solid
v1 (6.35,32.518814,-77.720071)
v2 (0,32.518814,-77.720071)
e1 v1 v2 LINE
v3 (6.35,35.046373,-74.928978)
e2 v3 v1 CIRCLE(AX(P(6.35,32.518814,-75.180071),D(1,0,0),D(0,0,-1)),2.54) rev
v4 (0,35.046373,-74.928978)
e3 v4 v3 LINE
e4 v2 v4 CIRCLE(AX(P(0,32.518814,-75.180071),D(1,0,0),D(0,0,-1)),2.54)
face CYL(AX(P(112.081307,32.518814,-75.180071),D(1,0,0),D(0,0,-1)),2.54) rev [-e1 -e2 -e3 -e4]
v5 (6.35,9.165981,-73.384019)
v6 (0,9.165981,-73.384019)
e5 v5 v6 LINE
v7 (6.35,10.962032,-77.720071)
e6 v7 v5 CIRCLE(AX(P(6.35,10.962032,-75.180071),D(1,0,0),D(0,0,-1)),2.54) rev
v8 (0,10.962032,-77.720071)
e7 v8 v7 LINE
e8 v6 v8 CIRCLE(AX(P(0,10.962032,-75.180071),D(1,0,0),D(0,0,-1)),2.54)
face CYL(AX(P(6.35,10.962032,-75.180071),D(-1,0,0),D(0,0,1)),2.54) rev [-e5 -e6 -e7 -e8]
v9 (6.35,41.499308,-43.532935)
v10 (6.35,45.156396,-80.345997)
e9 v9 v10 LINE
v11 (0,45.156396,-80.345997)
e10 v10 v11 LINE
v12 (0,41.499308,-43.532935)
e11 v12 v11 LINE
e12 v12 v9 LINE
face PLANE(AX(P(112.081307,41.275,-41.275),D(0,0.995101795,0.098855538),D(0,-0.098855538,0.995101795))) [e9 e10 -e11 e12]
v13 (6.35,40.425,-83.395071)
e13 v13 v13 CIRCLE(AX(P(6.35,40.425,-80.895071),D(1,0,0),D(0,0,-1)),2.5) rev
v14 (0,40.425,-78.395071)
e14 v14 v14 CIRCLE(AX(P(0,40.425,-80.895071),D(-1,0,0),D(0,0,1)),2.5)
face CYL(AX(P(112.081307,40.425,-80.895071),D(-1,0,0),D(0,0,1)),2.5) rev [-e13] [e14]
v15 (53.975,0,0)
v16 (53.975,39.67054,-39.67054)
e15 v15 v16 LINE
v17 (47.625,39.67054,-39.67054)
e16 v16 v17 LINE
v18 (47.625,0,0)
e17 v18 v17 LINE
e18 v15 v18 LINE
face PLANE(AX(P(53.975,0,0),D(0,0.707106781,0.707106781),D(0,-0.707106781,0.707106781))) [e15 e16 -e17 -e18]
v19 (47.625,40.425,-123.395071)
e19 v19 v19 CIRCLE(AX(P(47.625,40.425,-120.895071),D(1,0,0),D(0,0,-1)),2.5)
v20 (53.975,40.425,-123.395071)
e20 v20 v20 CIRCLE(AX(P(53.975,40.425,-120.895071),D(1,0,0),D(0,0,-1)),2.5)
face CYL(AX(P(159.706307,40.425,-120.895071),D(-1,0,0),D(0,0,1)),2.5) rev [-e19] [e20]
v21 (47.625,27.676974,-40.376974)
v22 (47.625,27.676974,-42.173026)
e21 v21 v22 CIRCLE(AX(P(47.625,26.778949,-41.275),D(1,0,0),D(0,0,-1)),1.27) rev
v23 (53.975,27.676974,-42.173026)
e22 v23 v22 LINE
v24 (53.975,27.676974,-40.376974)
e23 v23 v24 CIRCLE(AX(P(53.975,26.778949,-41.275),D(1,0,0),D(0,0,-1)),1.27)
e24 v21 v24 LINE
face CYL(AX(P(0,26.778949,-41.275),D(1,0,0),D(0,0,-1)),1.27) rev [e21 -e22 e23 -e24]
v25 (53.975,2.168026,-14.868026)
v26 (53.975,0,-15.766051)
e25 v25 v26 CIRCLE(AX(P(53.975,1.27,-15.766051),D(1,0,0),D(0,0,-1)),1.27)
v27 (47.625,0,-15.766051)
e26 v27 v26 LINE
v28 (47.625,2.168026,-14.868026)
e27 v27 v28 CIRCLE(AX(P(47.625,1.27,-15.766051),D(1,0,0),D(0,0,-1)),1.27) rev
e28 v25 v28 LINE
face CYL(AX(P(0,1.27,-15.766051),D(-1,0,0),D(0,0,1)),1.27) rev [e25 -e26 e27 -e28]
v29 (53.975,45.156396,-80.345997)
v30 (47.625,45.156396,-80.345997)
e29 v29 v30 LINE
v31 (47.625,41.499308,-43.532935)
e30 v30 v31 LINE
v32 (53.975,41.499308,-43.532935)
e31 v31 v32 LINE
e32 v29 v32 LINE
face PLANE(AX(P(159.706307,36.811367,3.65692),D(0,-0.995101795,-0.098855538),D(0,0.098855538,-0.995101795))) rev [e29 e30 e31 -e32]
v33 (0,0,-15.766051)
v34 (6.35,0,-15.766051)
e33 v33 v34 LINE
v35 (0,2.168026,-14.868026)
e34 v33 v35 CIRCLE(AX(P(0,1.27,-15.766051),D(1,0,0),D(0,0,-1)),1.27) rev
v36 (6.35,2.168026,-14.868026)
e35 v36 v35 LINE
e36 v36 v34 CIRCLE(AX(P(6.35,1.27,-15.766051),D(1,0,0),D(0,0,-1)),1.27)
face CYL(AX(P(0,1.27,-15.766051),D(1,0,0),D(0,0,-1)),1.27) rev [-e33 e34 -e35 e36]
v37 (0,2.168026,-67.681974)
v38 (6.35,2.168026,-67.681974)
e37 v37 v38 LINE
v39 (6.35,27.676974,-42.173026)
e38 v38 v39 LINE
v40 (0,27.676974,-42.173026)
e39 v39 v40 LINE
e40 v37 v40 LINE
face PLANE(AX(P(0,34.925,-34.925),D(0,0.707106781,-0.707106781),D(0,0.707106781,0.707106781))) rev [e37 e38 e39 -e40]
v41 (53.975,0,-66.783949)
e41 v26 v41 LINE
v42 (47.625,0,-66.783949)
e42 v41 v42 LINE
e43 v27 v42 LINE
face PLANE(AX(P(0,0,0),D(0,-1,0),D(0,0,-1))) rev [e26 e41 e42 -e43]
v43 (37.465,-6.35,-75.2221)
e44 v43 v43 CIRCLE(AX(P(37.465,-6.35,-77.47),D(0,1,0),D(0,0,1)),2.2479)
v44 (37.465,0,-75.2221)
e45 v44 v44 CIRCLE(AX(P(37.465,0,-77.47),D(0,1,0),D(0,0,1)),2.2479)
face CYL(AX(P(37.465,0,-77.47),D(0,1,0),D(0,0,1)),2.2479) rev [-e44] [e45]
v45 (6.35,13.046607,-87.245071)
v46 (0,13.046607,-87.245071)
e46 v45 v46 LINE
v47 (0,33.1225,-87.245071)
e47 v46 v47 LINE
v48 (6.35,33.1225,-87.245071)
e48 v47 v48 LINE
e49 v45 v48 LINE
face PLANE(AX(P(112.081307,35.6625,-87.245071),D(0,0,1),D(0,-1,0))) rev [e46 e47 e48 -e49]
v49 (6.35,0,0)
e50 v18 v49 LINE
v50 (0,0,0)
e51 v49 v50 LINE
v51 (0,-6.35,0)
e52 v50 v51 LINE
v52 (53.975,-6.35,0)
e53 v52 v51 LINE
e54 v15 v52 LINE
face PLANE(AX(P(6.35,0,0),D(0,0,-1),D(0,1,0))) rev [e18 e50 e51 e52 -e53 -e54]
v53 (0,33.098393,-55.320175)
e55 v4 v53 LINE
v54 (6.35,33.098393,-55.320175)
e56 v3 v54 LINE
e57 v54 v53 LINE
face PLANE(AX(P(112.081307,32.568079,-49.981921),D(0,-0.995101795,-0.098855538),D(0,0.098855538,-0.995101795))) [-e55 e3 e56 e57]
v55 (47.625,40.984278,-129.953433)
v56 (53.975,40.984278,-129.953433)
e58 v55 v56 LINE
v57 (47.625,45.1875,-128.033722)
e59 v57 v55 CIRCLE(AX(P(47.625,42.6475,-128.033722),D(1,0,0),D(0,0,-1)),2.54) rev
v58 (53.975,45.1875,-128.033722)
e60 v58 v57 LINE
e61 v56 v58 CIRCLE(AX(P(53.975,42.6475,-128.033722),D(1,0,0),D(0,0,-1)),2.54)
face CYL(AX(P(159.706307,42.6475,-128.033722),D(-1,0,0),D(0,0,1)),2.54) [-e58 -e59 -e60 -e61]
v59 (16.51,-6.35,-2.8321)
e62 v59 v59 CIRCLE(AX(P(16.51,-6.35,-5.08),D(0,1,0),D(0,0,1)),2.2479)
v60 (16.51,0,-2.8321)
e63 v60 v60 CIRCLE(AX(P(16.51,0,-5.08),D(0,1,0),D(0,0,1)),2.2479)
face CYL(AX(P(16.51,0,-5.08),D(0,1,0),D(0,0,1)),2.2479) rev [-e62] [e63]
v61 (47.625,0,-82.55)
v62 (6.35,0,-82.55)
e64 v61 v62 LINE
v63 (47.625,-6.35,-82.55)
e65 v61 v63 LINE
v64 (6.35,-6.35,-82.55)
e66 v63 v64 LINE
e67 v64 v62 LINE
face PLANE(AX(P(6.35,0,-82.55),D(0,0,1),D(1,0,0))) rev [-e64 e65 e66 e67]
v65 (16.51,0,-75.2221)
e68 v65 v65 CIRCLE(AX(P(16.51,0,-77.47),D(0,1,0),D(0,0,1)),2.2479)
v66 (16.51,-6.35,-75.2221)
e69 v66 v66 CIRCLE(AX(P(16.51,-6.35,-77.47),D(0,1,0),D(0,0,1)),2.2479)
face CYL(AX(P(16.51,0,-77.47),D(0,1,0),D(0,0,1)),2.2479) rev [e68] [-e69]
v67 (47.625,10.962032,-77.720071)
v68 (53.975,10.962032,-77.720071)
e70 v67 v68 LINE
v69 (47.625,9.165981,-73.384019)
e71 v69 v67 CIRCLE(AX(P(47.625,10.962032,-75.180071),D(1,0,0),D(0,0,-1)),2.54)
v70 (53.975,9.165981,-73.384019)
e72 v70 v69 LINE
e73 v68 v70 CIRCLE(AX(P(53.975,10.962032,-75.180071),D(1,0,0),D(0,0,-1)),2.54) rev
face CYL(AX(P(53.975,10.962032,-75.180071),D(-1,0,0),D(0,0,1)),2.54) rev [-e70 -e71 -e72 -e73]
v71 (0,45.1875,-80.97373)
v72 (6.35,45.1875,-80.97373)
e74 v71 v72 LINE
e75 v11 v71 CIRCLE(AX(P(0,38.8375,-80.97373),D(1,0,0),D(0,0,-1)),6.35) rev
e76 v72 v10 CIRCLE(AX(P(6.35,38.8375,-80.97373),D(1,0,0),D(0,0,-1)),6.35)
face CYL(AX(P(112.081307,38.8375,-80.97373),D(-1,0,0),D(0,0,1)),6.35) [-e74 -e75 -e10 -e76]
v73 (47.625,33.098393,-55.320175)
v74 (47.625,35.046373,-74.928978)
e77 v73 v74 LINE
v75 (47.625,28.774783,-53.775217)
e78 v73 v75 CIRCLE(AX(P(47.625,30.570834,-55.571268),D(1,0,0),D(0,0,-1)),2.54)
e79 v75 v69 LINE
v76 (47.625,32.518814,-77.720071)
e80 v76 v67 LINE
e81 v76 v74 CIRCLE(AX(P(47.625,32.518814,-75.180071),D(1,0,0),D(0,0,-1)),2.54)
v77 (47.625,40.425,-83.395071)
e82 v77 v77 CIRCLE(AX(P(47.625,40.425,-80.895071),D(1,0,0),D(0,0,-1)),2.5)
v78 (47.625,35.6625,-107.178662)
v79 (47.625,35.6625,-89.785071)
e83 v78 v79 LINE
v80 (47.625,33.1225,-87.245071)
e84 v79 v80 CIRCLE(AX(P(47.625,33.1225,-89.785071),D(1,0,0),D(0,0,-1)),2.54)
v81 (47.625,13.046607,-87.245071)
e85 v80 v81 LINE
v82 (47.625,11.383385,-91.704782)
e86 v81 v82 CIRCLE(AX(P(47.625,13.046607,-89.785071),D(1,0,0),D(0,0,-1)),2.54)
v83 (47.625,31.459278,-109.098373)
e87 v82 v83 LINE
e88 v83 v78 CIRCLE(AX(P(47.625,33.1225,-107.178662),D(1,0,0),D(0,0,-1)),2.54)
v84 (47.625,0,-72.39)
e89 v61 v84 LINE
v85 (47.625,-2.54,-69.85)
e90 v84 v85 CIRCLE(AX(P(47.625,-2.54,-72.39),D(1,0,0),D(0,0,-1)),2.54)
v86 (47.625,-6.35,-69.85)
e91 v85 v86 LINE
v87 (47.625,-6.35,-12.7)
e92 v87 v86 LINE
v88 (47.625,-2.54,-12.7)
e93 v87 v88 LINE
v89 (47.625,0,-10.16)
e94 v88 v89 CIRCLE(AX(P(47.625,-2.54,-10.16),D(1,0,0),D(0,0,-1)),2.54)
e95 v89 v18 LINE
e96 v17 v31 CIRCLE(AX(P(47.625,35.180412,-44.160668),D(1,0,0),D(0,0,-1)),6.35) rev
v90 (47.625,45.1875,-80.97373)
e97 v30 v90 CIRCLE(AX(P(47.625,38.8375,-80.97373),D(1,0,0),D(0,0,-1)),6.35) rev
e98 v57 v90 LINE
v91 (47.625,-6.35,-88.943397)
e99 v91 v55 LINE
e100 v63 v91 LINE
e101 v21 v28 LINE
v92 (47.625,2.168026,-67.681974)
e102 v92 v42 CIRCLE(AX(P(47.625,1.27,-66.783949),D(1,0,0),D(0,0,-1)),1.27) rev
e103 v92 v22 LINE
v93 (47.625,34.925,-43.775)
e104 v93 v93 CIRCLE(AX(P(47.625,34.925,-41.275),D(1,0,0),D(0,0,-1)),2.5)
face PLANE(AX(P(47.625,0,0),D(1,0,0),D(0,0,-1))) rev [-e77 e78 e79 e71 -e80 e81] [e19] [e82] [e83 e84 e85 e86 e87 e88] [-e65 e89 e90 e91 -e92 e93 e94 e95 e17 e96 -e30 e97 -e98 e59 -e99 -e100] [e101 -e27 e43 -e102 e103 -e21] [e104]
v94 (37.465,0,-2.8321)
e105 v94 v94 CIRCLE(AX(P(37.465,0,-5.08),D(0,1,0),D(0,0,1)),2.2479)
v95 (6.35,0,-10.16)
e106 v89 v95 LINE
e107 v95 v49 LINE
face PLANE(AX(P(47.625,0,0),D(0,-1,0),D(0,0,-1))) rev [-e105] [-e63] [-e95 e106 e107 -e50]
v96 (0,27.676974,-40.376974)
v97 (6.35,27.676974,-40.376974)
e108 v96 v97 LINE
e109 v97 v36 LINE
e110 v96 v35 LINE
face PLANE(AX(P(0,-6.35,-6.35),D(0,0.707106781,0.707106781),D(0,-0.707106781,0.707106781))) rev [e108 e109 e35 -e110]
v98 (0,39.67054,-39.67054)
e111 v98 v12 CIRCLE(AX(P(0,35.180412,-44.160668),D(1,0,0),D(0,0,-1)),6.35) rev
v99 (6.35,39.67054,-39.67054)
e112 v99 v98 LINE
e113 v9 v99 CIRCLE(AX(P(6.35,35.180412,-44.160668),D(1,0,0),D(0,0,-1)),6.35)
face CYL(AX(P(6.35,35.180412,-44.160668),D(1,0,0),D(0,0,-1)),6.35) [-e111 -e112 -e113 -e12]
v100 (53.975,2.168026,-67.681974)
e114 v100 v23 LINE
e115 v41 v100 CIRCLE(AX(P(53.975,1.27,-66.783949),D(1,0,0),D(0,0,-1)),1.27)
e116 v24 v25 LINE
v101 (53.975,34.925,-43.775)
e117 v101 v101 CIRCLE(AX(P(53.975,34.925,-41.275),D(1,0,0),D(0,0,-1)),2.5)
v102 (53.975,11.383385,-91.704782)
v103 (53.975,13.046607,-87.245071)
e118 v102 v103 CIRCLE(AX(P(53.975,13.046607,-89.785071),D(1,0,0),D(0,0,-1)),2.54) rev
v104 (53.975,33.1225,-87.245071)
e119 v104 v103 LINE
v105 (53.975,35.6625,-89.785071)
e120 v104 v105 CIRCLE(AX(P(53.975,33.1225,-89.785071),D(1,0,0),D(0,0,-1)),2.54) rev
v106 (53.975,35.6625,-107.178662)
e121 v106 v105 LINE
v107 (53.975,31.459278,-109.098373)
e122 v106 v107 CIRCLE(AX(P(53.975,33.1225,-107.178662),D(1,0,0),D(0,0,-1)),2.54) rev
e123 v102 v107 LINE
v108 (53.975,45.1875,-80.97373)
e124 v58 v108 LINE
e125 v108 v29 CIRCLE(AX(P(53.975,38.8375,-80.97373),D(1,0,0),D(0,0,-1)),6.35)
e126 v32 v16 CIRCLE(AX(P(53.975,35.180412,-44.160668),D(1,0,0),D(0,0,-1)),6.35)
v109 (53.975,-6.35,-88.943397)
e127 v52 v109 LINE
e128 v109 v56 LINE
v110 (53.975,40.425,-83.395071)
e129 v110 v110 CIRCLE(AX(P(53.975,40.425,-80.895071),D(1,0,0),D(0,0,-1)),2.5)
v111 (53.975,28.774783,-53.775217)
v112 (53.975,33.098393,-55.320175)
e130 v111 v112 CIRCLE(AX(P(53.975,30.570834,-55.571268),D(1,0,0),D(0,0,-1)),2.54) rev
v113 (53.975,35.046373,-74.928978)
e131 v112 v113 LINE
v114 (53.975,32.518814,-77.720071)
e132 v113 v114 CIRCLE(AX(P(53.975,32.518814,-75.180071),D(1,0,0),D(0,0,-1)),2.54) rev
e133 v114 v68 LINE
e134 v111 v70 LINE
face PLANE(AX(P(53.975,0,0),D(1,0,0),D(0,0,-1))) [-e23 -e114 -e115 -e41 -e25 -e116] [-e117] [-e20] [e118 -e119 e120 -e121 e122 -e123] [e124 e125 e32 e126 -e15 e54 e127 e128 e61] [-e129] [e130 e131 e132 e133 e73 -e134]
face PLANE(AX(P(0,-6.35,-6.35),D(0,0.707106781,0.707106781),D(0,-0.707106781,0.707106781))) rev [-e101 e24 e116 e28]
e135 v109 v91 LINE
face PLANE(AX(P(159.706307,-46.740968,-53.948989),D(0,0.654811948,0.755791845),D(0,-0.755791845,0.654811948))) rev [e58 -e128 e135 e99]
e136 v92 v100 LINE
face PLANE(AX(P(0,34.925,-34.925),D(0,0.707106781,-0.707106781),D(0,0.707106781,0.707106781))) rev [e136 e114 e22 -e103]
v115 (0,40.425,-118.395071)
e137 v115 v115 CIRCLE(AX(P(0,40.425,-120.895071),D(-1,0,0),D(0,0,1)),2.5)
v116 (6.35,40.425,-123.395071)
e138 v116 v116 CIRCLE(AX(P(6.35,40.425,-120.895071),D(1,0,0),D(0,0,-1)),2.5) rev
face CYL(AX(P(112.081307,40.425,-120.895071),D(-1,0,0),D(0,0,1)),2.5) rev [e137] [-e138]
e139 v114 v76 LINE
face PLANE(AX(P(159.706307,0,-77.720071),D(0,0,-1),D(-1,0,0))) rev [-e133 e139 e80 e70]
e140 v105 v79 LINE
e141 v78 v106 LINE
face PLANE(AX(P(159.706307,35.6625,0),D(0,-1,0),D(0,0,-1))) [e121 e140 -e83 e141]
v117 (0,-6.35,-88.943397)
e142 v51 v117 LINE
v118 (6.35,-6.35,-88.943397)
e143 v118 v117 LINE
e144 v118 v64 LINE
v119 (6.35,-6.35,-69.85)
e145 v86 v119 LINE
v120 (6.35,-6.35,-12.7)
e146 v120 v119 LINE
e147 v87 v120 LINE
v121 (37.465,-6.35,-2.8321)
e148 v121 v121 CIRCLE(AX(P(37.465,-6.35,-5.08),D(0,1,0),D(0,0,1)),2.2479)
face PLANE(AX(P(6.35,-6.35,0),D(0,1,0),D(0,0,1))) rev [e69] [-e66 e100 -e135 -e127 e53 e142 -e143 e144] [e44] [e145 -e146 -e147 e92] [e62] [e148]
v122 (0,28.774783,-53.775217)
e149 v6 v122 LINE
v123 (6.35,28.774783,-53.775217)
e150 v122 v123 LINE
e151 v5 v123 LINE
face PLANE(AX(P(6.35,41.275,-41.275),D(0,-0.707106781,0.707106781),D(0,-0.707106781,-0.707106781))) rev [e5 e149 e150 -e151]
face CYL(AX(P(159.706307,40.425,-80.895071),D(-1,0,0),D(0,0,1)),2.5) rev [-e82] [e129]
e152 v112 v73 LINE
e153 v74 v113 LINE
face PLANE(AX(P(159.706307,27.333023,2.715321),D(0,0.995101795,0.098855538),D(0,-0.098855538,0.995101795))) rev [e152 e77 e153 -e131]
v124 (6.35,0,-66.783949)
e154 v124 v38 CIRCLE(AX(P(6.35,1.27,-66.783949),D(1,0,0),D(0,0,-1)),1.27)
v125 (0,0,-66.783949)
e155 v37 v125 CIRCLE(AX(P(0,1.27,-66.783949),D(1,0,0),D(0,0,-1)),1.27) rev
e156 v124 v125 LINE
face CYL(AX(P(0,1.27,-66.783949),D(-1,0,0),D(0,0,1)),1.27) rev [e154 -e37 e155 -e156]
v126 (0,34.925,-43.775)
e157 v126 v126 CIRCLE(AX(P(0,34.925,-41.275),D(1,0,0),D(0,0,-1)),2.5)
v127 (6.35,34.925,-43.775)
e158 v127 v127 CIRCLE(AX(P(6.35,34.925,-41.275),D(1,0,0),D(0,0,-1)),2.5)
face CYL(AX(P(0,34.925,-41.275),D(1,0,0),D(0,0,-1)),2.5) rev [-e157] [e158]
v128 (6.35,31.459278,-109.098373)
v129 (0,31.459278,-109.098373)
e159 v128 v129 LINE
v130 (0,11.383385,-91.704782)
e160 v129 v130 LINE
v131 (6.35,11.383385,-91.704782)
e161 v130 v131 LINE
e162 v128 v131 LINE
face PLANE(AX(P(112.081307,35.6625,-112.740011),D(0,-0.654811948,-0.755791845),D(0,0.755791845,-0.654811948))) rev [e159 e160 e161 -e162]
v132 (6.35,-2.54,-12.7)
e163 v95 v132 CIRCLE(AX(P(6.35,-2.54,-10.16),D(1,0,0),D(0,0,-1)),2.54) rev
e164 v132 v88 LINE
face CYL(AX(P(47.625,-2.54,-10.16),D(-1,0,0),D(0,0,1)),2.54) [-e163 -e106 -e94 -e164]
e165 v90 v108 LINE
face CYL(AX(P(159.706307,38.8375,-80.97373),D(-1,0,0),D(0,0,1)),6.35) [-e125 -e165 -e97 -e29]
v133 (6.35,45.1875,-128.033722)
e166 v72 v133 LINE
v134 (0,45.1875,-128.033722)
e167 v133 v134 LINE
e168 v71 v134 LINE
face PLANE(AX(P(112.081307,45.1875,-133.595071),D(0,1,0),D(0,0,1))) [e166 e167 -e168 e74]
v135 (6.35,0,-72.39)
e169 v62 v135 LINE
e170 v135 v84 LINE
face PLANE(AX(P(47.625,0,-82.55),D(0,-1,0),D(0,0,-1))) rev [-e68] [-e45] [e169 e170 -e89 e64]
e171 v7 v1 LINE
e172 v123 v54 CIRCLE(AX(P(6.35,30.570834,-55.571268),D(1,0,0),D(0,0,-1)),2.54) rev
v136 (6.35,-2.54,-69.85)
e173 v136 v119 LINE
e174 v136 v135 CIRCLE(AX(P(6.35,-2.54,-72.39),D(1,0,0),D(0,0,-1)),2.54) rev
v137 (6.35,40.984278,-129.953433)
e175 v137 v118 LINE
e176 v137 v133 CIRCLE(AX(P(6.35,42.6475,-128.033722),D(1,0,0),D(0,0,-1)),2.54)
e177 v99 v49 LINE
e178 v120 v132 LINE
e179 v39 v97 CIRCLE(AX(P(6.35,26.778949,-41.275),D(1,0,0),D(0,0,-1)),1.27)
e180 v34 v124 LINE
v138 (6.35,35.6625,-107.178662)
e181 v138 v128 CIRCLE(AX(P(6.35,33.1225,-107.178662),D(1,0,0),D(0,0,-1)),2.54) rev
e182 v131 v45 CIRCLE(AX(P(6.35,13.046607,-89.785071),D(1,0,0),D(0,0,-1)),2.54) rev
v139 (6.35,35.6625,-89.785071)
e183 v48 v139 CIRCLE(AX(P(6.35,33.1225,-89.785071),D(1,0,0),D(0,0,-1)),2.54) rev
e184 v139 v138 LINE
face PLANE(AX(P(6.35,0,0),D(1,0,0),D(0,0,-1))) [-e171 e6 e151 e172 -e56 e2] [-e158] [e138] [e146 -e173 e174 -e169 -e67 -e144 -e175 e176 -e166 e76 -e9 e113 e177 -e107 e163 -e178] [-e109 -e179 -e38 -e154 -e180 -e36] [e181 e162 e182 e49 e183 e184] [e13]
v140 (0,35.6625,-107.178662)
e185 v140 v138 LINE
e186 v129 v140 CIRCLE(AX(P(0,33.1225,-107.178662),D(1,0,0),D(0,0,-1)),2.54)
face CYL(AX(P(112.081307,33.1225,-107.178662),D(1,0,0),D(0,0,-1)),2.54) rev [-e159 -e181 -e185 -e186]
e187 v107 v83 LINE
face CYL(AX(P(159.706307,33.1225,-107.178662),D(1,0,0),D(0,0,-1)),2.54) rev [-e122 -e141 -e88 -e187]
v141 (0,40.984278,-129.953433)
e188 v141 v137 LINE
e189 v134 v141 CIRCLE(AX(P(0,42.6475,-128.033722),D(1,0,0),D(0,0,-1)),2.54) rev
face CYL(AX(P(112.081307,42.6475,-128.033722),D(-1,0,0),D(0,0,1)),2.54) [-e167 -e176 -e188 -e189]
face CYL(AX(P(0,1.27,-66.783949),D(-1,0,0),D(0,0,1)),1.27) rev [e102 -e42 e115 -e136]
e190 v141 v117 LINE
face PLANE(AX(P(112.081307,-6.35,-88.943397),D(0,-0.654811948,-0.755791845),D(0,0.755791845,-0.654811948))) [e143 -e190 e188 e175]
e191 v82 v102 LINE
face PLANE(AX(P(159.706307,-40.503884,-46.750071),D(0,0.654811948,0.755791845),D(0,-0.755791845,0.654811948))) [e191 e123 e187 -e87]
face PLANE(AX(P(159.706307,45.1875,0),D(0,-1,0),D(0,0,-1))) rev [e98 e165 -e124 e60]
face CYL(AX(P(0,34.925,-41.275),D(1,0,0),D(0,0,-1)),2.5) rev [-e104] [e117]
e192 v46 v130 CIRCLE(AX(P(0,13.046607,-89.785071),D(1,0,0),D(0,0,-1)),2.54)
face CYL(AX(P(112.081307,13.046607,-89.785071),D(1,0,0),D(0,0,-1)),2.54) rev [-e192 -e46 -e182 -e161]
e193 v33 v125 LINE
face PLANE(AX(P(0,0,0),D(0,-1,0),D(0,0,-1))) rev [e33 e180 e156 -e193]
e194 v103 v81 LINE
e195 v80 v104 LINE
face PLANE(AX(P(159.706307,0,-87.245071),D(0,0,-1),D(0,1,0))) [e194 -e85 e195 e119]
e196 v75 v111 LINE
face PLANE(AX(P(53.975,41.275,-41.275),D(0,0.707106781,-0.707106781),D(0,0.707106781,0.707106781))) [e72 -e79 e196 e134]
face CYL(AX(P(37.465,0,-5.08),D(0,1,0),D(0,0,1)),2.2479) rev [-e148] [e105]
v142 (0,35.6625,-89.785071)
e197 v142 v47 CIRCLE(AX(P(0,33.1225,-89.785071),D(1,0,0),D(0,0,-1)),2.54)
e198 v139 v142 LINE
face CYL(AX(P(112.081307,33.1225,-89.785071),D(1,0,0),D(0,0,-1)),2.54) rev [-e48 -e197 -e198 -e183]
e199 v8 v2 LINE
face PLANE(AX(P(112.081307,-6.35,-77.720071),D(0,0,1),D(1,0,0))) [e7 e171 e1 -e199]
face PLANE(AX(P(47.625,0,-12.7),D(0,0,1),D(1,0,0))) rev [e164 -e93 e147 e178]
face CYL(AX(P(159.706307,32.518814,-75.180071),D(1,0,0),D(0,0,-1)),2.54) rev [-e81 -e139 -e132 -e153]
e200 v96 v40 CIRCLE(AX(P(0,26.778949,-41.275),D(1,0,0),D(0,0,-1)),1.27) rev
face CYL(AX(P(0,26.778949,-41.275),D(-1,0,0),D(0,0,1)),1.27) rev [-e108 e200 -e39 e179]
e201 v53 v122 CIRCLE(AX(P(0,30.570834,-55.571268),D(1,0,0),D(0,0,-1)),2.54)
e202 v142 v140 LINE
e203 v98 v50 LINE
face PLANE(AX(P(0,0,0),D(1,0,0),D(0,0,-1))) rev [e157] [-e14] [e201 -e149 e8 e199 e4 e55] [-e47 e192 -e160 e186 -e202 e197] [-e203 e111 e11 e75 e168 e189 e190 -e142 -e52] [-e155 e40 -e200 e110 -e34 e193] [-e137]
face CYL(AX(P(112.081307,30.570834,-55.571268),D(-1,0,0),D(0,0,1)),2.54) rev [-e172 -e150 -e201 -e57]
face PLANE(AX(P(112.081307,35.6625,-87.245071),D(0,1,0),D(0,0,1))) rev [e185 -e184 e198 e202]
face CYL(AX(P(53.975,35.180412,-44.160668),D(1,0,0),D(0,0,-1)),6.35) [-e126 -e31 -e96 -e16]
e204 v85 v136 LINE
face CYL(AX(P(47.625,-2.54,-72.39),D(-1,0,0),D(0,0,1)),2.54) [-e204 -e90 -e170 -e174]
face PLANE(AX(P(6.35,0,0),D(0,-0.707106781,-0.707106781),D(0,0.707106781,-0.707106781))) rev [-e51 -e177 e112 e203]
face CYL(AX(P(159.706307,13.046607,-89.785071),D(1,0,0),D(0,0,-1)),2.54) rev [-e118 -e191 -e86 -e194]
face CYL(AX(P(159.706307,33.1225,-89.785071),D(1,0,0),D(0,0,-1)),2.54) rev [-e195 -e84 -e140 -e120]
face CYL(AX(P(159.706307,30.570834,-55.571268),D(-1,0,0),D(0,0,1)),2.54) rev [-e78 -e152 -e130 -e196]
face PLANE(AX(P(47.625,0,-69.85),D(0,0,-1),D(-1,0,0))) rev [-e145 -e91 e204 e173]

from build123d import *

# Parameters (mm, degrees)
BOSS_EXTRUDE3_DEPTH   = 6.35
SKETCH13_W            = 12.7
SKETCH13_H            = 6.35
BOSS_EXTRUDE4_DEPTH   = 41.275
SKETCH14_W            = 12.7
SKETCH14_H            = 6.35
SKETCH14_W_2          = 69.85
BOSS_EXTRUDE5_DEPTH   = 6.35
CUT_EXTRUDE4_DEPTH    = 107.917859827
CUT_EXTRUDE5_DEPTH    = 107.917859827
SKETCH26_R            = 2.5
BOSS_EXTRUDE6_DEPTH   = 6.35
BOSS_EXTRUDE7_START   = -47.625
SKETCH26_2_R          = 2.5
BOSS_EXTRUDE7_DEPTH   = 6.35
FILLET17_R            = 1.27
FILLET18_R            = 1.27
FILLET19_R            = 1.27
FILLET20_START        = 47.625
FILLET20_DEPTH        = 6.35
FILLET21_R            = 1.27
FILLET22_DEPTH        = 6.35
FILLET29_R            = 2.54
F_8_CLEARANCE_HOLE1_D = 4.4958
FILLET30_R            = 6.35
FILLET31_R            = 2.54


with BuildPart() as part:
    # Sketch4 → Boss-Extrude3 (new body)
    with BuildSketch(Plane(origin=(0, 0, 0), x_dir=(0, 0, -1), z_dir=(1, 0, 0))):
        Polygon((0, 0), (41.275, 41.275), (82.55, 0), (82.55, -6.35), (0, -6.35), align=None)
    extrude(amount=BOSS_EXTRUDE3_DEPTH)

    # Sketch13 → Boss-Extrude4 (add)
    with BuildSketch(Plane(origin=(6.35, 0, 0), x_dir=(0, 0, -1), z_dir=(1, 0, 0))):
        with Locations((6.35, -3.175)):
            Rectangle(SKETCH13_W, SKETCH13_H)
        with Locations((76.2, -3.175)):
            Rectangle(SKETCH13_W, SKETCH13_H)
    extrude(amount=BOSS_EXTRUDE4_DEPTH)

    # Sketch14 → Boss-Extrude5 (add)
    with BuildSketch(Plane(origin=(47.625, 0, 0), x_dir=(0, 0, -1), z_dir=(1, 0, 0))):
        Polygon((41.275, 41.275), (0, 0), (12.7, 0), (82.55, 0), align=None)
        with Locations((6.35, -3.175)):
            Rectangle(SKETCH14_W, SKETCH14_H)
        with Locations((47.625, -3.175)):
            Rectangle(SKETCH14_W_2, SKETCH14_H)
    extrude(amount=BOSS_EXTRUDE5_DEPTH)

    # Sketch20 → Cut-Extrude4 (cut, through all)
    with BuildSketch(Plane(origin=(53.975, 0, 0), x_dir=(0, 0, -1), z_dir=(1, 0, 0))):
        Polygon((41.275, 28.575), (12.7, 0), (69.85, 0), align=None)
    extrude(amount=-CUT_EXTRUDE4_DEPTH, mode=Mode.SUBTRACT)

    # Sketch21 → Cut-Extrude5 (cut, through all)
    with BuildSketch(Plane(origin=(53.975, 0, 0), x_dir=(0, 0, -1), z_dir=(1, 0, 0))):
        with BuildLine():
            ThreePointArc((43.775, 34.925), (43.042766953, 36.692766953), (41.275, 37.425))
            Line((41.275, 37.425), (41.275, 32.425))
            ThreePointArc((41.275, 32.425), (43.042766953, 33.157233047), (43.775, 34.925))
        make_face()
        with BuildLine():
            Line((41.275, 32.425), (41.275, 37.425))
            ThreePointArc((41.275, 37.425), (38.775, 34.925), (41.275, 32.425))
        make_face()
    extrude(amount=-CUT_EXTRUDE5_DEPTH, mode=Mode.SUBTRACT)

    # Sketch26 → Boss-Extrude6 (add)
    with BuildSketch(Plane.ZY):
        Polygon((-41.275, 41.275), (-80.659092999, 45.187499922), (-133.595070682, 45.187499922), (-88.943397116, -6.35), (-77.720070682, -6.35), (-77.720070682, 35.323646113), (-49.981920931, 32.568079069), align=None)
        with Locations((-80.895070682, 40.424999922)):
            Circle(SKETCH26_R, mode=Mode.SUBTRACT)
        with Locations((-120.895070682, 40.424999922)):
            Circle(SKETCH26_R, mode=Mode.SUBTRACT)
        Polygon((-87.245070682, 35.662499922), (-87.245070682, 6.23593212), (-112.740011292, 35.662499922), align=None, mode=Mode.SUBTRACT)
    extrude(amount=-BOSS_EXTRUDE6_DEPTH)

    # Sketch26<2> → Boss-Extrude7 (add)
    with BuildSketch(Plane.ZY.offset(BOSS_EXTRUDE7_START)):
        Polygon((-41.275, 41.275), (-80.659092999, 45.187499922), (-133.595070682, 45.187499922), (-88.943397116, -6.35), (-77.720070682, -6.35), (-77.720070682, 35.323646113), (-49.981920931, 32.568079069), align=None)
        with Locations((-80.895070682, 40.424999922)):
            Circle(SKETCH26_2_R, mode=Mode.SUBTRACT)
        with Locations((-120.895070682, 40.424999922)):
            Circle(SKETCH26_2_R, mode=Mode.SUBTRACT)
        Polygon((-87.245070682, 35.662499922), (-87.245070682, 6.23593212), (-112.740011292, 35.662499922), align=None, mode=Mode.SUBTRACT)
    extrude(amount=-BOSS_EXTRUDE7_DEPTH)

    # Fillet17
    fillet17_edges = [part.edges().sort_by_distance(p)[0] for p in [
        (3.175, 28.575, -41.275),
    ]]
    fillet(fillet17_edges, radius=FILLET17_R)

    # Fillet18
    fillet18_edges = [part.edges().sort_by_distance(p)[0] for p in [
        (50.8, 28.575, -41.275),
    ]]
    fillet(fillet18_edges, radius=FILLET18_R)

    # Fillet19
    # the kernel refuses this fillet: 1.27 mm, written as the material it adds along each edge
    with BuildSketch(Plane(origin=(53.975, 0, -12.7), x_dir=(0, 0.7071067811865481, -0.7071067811865469), z_dir=(-1, 0, 0))) as fillet19_piece_1:
        with BuildLine():
            CenterArc((FILLET19_R * 2.41421356237, FILLET19_R), FILLET19_R, 135, 135)
            Line((FILLET19_R * 1.70710678119, FILLET19_R * 1.70710678119), (0, 0))
            Line((0, 0), (FILLET19_R * 2.41421356237, 0))
        make_face()
    extrude(amount=6.35)

    # Fillet20: read off the stored shape, not the designer's step
    # Fillet20 outline → Fillet20 (add)
    with BuildSketch(Plane.YZ.offset(FILLET20_START)):
        with BuildLine():
            Line((0, -69.85), (2.168025612, -67.681974388))
            ThreePointArc((2.168025612, -67.681974388), (0.783992041, -67.957275782), (0, -66.783948776))
            Line((0, -66.783948776), (0, -69.85))
        make_face()
    extrude(amount=FILLET20_DEPTH)

    # Fillet21
    # the kernel refuses this fillet: 1.27 mm, written as the material it adds along each edge
    with BuildSketch(Plane(origin=(6.35, 0, -69.85), x_dir=(0, 0, 1), z_dir=(-1, 0, 0))) as fillet21_piece_1:
        with BuildLine():
            CenterArc((FILLET21_R * 2.41421356237, FILLET21_R), FILLET21_R, 135, 135)
            Line((FILLET21_R * 1.70710678119, FILLET21_R * 1.70710678119), (0, 0))
            Line((0, 0), (FILLET21_R * 2.41421356237, 0))
        make_face()
    extrude(amount=6.35)

    # Fillet22: read off the stored shape, not the designer's step
    # Fillet22 outline → Fillet22 (add)
    with BuildSketch(Plane.YZ):
        with BuildLine():
            ThreePointArc((0, -15.766051224), (0.783992041, -14.592724218), (2.168025612, -14.868025612))
            Line((2.168025612, -14.868025612), (0, -12.7))
            Line((0, -12.7), (0, -15.766051224))
        make_face()
    extrude(amount=FILLET22_DEPTH)

    # Fillet29
    fillet29_edges = [part.edges().sort_by_distance(p)[0] for p in [
        (26.9875, 0, -12.7),
        (26.9875, 0, -69.85),
    ]]
    fillet(fillet29_edges, radius=FILLET29_R)

    # #8 Clearance Hole1 (through all)
    with Locations(Plane(origin=(0, 0, 0), x_dir=(1, 0, 0), z_dir=(0, 1, 0))):
        with Locations((16.51, 77.47), (37.465, 77.47), (37.465, 5.08), (16.51, 5.08)):
            Hole(F_8_CLEARANCE_HOLE1_D / 2)

    # Fillet30
    # the kernel refuses this fillet: 6.35 mm, written as the material it takes off along each edge
    with BuildSketch(Plane(origin=(-0.786592277, 45.187499922, -80.659092999), x_dir=(0, -0.0988555378398254, 0.995101795113645), z_dir=(1, 0, 0))) as fillet30_piece_1:
        with BuildLine():
            CenterArc((FILLET30_R * 0.0495491197902, FILLET30_R), FILLET30_R, 264.326728924, 5.673271076)
            Line((-FILLET30_R * 0.0493064180496, FILLET30_R * 0.00489820488635), (0, 0))
            Line((0, 0), (FILLET30_R * 0.0495491197903, 0))
        make_face()
    extrude(amount=7.923184553, mode=Mode.SUBTRACT)
    with BuildSketch(Plane(origin=(46.838407723, 45.187499922, -80.659092999), x_dir=(0, 0, -1), z_dir=(1, 0, 0))) as fillet30_piece_2:
        with BuildLine():
            CenterArc((FILLET30_R * 0.0495491197903, -FILLET30_R), FILLET30_R, 90, 5.673271076)
            Line((-FILLET30_R * 0.0493064180496, -FILLET30_R * 0.00489820488636), (0, 0))
            Line((0, 0), (FILLET30_R * 0.0495491197903, 0))
        make_face()
    extrude(amount=7.923184553, mode=Mode.SUBTRACT)
    with BuildSketch(Plane(origin=(41.952376432, 41.275, -41.275), x_dir=(0, -0.7071067811865476, 0.7071067811865476), z_dir=(1, 0, 0)), Plane(origin=(-5.672623568, 41.275, -41.275), x_dir=(0, -0.7071067811865459, 0.707106781186549), z_dir=(1, 0, 0))) as fillet30_piece_3:
        with BuildLine():
            CenterArc((FILLET30_R * 0.357330618477, FILLET30_R), FILLET30_R, 230.673271076, 39.326728924)
            Line((-FILLET30_R * 0.276411187654, FILLET30_R * 0.22645535154), (0, 0))
            Line((0, 0), (FILLET30_R * 0.357330618477, 0))
        make_face()
    extrude(amount=17.695247137, mode=Mode.SUBTRACT)

    # Fillet31
    fillet31_edges = [part.edges().sort_by_distance(p)[0] for p in [
        (3.175, 35.323646113, -77.720070682),
        (3.175, 32.568079069, -49.981920931),
        (3.175, 4.829929318, -77.720070682),
        (3.175, 45.187499922, -133.595070682),
        (3.175, 35.662499922, -87.245070682),
        (3.175, 6.23593212, -87.245070682),
        (3.175, 35.662499922, -112.740011292),
        (50.8, 4.829929318, -77.720070682),
        (50.8, 35.323646113, -77.720070682),
        (50.8, 32.568079069, -49.981920931),
        (50.8, 45.187499922, -133.595070682),
        (50.8, 35.662499922, -87.245070682),
        (50.8, 35.662499922, -112.740011292),
        (50.8, 6.23593212, -87.245070682),
    ]]
    fillet(fillet31_edges, radius=FILLET31_R)


solid = part.part
